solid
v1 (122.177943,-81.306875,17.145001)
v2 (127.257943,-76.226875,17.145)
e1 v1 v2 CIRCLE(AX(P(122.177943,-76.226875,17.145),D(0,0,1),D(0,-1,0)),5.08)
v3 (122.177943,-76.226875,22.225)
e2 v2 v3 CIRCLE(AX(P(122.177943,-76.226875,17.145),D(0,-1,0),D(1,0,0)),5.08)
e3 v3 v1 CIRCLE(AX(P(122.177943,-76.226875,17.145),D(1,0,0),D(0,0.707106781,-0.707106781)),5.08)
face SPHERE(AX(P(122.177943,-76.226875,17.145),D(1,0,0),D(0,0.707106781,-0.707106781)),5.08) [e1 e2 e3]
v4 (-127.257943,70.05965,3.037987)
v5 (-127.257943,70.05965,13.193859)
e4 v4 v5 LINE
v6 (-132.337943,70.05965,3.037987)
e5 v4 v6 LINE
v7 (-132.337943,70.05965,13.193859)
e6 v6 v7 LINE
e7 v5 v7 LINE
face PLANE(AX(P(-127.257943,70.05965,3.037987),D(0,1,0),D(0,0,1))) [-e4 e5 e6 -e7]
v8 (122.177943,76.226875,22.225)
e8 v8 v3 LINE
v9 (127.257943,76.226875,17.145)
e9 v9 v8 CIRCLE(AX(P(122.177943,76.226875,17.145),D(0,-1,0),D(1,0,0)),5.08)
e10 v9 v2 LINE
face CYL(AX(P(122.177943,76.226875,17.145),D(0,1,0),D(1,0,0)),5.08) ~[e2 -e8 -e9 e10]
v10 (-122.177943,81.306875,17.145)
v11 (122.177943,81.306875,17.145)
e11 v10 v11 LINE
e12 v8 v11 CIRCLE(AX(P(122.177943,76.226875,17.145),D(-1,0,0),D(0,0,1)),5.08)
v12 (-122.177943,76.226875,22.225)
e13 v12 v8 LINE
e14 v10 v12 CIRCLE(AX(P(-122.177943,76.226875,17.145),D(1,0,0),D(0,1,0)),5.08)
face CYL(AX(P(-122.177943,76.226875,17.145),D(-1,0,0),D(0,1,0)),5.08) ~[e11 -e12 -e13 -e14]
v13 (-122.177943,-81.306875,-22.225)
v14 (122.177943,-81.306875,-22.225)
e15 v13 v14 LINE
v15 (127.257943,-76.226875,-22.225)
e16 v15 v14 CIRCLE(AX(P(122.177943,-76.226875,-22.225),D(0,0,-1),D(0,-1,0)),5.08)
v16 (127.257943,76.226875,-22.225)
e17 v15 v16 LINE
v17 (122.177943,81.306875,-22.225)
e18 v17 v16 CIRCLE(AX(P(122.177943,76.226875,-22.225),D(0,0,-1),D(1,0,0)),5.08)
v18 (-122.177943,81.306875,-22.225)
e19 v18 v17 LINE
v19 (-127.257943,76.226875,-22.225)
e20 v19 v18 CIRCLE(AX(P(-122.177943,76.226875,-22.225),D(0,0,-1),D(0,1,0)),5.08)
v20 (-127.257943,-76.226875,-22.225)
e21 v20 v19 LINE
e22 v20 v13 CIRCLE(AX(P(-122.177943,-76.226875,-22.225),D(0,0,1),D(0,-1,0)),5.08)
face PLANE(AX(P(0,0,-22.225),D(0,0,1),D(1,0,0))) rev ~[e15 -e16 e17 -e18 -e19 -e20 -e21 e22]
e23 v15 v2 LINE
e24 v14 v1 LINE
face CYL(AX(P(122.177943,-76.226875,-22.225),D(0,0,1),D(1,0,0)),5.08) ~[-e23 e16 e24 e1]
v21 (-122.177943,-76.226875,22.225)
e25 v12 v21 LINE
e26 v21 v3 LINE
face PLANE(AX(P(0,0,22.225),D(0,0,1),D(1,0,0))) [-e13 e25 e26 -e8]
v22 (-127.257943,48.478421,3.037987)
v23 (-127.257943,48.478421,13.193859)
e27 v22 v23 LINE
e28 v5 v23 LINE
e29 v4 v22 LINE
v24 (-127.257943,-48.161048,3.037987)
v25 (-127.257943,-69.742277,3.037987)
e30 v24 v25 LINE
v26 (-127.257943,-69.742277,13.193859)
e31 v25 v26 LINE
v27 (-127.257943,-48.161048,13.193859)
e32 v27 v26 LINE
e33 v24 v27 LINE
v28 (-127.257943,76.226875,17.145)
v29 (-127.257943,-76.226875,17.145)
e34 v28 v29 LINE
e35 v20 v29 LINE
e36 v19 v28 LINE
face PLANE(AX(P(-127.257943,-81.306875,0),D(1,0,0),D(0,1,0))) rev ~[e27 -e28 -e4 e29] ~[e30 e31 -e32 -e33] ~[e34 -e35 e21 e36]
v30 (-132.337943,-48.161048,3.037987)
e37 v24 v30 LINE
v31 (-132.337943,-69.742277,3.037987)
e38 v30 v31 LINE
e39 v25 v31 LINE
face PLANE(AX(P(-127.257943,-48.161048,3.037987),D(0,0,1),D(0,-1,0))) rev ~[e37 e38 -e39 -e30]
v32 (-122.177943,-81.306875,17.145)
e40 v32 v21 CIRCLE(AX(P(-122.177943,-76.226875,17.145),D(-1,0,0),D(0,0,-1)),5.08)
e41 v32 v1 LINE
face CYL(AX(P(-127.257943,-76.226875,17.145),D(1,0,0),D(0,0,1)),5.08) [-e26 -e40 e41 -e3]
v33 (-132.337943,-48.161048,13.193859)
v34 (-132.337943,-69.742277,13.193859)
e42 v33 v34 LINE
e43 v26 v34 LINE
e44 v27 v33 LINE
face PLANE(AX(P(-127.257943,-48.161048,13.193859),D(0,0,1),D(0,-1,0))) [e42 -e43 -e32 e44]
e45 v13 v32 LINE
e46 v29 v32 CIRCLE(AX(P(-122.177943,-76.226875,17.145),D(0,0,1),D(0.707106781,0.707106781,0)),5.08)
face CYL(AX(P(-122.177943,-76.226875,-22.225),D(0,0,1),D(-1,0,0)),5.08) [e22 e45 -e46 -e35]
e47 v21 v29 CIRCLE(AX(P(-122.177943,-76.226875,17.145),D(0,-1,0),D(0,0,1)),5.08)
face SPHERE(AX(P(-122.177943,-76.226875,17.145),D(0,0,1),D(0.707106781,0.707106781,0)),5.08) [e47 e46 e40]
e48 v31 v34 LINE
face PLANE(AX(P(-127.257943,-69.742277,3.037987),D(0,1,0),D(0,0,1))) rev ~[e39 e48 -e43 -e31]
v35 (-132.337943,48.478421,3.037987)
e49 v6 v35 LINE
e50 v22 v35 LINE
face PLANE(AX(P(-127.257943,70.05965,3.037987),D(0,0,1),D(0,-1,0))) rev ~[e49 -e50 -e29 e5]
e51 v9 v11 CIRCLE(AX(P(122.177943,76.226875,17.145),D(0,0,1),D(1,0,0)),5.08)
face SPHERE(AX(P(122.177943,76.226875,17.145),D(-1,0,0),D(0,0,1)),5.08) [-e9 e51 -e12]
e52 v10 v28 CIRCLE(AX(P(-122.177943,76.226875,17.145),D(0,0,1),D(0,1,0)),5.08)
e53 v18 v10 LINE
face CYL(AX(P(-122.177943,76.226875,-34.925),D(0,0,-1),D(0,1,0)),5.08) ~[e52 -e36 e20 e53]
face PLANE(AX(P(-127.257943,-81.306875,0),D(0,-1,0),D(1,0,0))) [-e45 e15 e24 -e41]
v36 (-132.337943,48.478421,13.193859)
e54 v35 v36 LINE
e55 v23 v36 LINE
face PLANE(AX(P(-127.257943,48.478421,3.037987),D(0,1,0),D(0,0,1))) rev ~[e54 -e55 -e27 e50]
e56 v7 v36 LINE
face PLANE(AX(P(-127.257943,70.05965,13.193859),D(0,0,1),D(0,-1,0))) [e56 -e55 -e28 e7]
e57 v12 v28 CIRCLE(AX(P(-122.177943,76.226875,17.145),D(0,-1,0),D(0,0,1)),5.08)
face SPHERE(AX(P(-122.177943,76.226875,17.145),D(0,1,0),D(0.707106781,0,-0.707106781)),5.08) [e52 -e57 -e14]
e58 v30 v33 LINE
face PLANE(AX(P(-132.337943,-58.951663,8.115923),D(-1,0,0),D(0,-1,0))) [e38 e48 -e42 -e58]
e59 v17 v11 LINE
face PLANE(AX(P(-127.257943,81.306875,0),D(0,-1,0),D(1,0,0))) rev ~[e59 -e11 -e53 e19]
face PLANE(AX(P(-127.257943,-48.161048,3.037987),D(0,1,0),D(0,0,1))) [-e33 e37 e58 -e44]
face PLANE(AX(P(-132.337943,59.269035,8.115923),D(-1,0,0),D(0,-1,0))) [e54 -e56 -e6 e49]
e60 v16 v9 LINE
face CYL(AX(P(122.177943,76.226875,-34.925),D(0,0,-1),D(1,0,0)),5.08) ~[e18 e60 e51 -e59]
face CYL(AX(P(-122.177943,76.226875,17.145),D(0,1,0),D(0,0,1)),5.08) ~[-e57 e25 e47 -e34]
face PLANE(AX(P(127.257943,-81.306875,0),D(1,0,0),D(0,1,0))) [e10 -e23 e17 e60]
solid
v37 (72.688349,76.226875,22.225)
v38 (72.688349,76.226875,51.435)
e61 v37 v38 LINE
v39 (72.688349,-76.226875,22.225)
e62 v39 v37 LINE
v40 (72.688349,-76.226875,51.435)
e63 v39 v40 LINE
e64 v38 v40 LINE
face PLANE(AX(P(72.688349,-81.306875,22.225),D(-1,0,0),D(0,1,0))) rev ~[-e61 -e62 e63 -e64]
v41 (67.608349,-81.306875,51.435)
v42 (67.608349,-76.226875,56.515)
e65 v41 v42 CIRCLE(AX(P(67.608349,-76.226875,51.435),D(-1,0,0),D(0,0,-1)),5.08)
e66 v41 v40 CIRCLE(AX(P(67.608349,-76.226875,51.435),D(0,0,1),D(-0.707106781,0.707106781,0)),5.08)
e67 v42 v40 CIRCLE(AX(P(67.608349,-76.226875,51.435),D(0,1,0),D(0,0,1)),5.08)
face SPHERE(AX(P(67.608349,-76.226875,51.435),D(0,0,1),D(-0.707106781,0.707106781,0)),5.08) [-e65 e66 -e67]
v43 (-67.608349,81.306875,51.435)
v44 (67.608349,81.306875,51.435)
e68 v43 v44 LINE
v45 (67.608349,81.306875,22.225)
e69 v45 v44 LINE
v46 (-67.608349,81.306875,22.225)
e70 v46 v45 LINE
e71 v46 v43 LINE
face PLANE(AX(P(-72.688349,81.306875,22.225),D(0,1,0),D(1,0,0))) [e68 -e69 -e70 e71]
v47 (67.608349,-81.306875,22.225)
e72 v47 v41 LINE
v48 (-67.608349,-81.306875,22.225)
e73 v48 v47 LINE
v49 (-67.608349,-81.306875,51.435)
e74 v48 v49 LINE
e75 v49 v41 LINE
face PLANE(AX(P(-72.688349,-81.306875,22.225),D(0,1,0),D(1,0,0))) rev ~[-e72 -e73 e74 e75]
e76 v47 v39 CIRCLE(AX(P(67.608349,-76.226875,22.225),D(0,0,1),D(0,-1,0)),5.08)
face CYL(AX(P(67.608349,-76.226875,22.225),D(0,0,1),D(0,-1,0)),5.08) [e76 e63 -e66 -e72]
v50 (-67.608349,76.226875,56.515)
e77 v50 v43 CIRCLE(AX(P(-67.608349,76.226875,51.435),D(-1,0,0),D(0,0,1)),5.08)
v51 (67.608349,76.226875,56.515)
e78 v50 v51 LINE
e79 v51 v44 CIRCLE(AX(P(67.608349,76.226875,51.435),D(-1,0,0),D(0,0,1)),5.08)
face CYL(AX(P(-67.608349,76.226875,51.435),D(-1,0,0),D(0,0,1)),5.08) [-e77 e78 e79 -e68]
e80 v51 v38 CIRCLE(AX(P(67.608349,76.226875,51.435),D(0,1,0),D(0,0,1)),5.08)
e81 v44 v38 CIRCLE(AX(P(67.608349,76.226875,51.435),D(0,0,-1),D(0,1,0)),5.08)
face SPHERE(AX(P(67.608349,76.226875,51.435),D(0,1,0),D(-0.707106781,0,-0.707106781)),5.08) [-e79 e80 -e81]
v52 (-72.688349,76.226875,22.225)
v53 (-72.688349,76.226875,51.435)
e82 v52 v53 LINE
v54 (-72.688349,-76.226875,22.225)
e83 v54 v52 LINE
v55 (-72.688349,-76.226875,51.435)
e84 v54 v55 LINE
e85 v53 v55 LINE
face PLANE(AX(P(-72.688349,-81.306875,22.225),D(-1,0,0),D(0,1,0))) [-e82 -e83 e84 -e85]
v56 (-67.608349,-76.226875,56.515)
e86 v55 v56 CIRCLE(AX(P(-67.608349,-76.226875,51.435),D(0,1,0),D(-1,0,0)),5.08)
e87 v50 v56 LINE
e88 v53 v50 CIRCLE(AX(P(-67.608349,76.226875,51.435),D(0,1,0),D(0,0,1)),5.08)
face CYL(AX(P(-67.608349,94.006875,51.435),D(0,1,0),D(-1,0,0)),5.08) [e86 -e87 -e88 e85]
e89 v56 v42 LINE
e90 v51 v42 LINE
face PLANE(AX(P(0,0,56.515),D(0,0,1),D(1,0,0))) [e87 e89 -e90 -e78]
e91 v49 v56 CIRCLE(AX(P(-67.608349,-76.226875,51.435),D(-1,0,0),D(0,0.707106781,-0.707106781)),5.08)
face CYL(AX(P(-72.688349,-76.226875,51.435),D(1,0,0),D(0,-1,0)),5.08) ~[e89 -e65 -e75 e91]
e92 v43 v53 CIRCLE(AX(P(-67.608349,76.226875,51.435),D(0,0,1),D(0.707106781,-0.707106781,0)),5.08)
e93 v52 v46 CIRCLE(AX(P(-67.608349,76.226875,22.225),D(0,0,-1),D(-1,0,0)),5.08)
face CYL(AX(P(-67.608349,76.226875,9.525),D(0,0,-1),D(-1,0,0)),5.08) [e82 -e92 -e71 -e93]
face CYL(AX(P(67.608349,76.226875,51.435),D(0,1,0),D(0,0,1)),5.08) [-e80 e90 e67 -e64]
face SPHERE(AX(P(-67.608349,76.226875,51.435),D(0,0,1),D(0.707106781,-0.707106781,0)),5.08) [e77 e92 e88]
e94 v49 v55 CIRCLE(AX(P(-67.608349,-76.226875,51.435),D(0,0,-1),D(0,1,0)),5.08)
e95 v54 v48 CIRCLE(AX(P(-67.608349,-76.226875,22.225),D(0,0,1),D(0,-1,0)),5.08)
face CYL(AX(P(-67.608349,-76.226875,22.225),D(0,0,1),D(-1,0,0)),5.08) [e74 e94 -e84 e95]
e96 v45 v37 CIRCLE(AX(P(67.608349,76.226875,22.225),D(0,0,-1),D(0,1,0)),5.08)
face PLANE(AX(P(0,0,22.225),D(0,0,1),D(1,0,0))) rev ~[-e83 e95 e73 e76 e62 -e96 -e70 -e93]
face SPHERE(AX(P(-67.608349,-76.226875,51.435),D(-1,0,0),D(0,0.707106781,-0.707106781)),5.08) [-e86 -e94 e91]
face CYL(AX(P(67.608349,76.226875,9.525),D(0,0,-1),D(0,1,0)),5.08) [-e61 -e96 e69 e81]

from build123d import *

# Parameters (mm, degrees)
F0_W            = 254.5158863068
F0_H            = 162.6137495041
F1_DEPTH        = 22.225
F2_W            = 145.3766971827
F2_H            = 162.6137495041
F3_DEPTH        = 34.29
F9_R            = 5.08
F10_R           = 5.08
F11_T1_DEPTH    = 170.2337495041
F11_T3_DEPTH    = 59.69
F11_S7_W        = 5.08
F11_S7_H        = 5.08
F11_T8_DEPTH    = 5.08
F12_T1_DEPTH    = 152.4537495041
F12_T3_DEPTH    = 52.07
F12_T5_DEPTH    = 262.1358863068
F12_S9_W        = 5.08
F12_S9_H        = 5.08
F12_T10_DEPTH   = 5.08
F12_S15_W       = 5.08
F12_S15_H       = 5.08
F12_T16_DEPTH   = 5.08
F13_T1_DEPTH    = 152.4537495041
F13_T3_DEPTH    = 41.91
F13_T5_DEPTH    = 135.2166971826
F13_S9_W        = 5.08
F13_S9_H        = 5.08
F13_T10_DEPTH   = 5.08
F13_S15_W       = 5.08
F13_S15_H       = 5.08
F13_T16_DEPTH   = 5.08
F13_S21_W       = 5.08
F13_S21_H       = 5.08
F13_T22_DEPTH   = 5.08
F13_2_T1_DEPTH  = 152.453749504
F13_2_T3_DEPTH  = 52.07
F13_2_S7_W      = 5.08
F13_2_S7_H      = 5.08
F13_2_T8_DEPTH  = 5.08
F13_2_T12_ANGLE = 90.0000000017
F14_W           = 21.5812288225
F14_H           = 10.1558715105
F15_DEPTH       = 5.08


# Not quite as in the source:
# - a fillet or chamfer that OpenCascade refuses, or shapes differently, is made with other operations: its cross-section is extruded or revolved along the edge and cut away or added


with BuildPart() as f1:
    # F0 (on Top) → F1 (new body, symmetric)
    with BuildSketch(Plane.XY):
        Rectangle(F0_W, F0_H)
    extrude(amount=F1_DEPTH, both=True)

    # F10
    f10_edges = [f1.edges().sort_by_distance(p)[0] for p in [
        (0, -81.306875, 22.225),
        (-127.257943, -81.306875, 0),
        (127.257943, -81.306875, 0),
    ]]
    fillet(f10_edges, radius=F10_R)

    # F12: fillet of radius 5.08 on 3 edges, made by hand

    # F12_s2 → F12_t1 (cut)
    with BuildSketch(Plane.XZ.offset(-76.226874752)):
        with BuildLine():
            ThreePointArc((-122.1779431534, 22.225), (-125.7700456018, 20.7371024484), (-127.2579431534, 17.145))
            Line((-127.2579431534, 17.145), (-127.2579431534, 22.225))
            Line((-127.2579431534, 22.225), (-122.1779431534, 22.225))
        make_face()
    extrude(amount=F12_T1_DEPTH, mode=Mode.SUBTRACT)

    # F12_s4 → F12_t3 (cut)
    with BuildSketch(Plane.XY.offset(-34.925)):
        with BuildLine():
            ThreePointArc((-122.1779431534, 81.306874752), (-125.7700456018, 79.8189772005), (-127.2579431534, 76.226874752))
            Line((-127.2579431534, 76.226874752), (-127.2579431534, 81.306874752))
            Line((-127.2579431534, 81.306874752), (-122.1779431534, 81.306874752))
        make_face()
    extrude(amount=F12_T3_DEPTH, mode=Mode.SUBTRACT)

    # F12_s6 → F12_t5 (cut)
    with BuildSketch(Plane.YZ.offset(-122.1779431534)):
        with BuildLine():
            ThreePointArc((81.306874752, 17.145), (79.8189772005, 20.7371024484), (76.226874752, 22.225))
            Line((76.226874752, 22.225), (81.306874752, 22.225))
            Line((81.306874752, 22.225), (81.306874752, 17.145))
        make_face()
    extrude(amount=F12_T5_DEPTH, mode=Mode.SUBTRACT)


with BuildPart() as f3:
    # F2 (on face) → F3 (new body)
    with BuildSketch(Plane.XY.offset(22.225)):
        Rectangle(F2_W, F2_H)
    extrude(amount=F3_DEPTH)

    # F9
    f9_edges = [f3.edges().sort_by_distance(p)[0] for p in [
        (0, -81.306875, 56.515),
        (-72.688349, -81.306875, 39.37),
        (72.688349, -81.306875, 39.37),
    ]]
    fillet(f9_edges, radius=F9_R)

    # F11: fillet of radius 5.08 on 2 edges, made by hand

    # F11_s2 → F11_t1 (cut)
    with BuildSketch(Plane.XZ.offset(-94.006874752)):
        with BuildLine():
            ThreePointArc((-72.6883485913, 51.435), (-71.2004510398, 55.0271024484), (-67.6083485913, 56.515))
            Line((-67.6083485913, 56.515), (-72.6883485913, 56.515))
            Line((-72.6883485913, 56.515), (-72.6883485913, 51.435))
        make_face()
    extrude(amount=F11_T1_DEPTH, mode=Mode.SUBTRACT)

    # F11_s4 → F11_t3 (cut)
    with BuildSketch(Plane.XY.offset(9.525)):
        with BuildLine():
            ThreePointArc((-72.6883485913, 76.226874752), (-71.2004510398, 79.8189772005), (-67.6083485913, 81.306874752))
            Line((-67.6083485913, 81.306874752), (-72.6883485913, 81.306874752))
            Line((-72.6883485913, 81.306874752), (-72.6883485913, 76.226874752))
        make_face()
    extrude(amount=F11_T3_DEPTH, mode=Mode.SUBTRACT)


with BuildPart() as f11_tool6:
    # F11_s7 → F11_t8 (new body)
    with BuildSketch(Plane.YZ.offset(-67.6083485913)):
        with Locations((-78.766874752, 53.975)):
            Rectangle(F11_S7_W, F11_S7_H)
    extrude(amount=-F11_T8_DEPTH)

    # F11_s9 → F11_t10 (revolve, cut)
    with BuildSketch(Plane(origin=(-67.6083485913, -76.226874752, 51.435), x_dir=(0, 0.7071067812, -0.7071067812), z_dir=(0, 0.7071067812, 0.7071067812))):
        with BuildLine():
            ThreePointArc((0, -5.08), (5.08, 0), (0, 5.08))
            Line((0, 5.08), (0, -5.08))
        make_face()
    revolve(axis=Axis((-67.6083485913, -76.226874752, 51.435), (-1, 0, 0)), mode=Mode.SUBTRACT)


with BuildPart() as f3_1:
    add(f3.part)

    # F11_t5: cut F11_tool6
    add(f11_tool6.part, mode=Mode.SUBTRACT)

    # F13: fillet of radius 5.08 on 3 edges, made by hand

    # F13_s2 → F13_t1 (cut)
    with BuildSketch(Plane.XZ.offset(-76.226874752)):
        with BuildLine():
            ThreePointArc((67.6083485913, 56.515), (71.2004510398, 55.0271024484), (72.6883485913, 51.435))
            Line((72.6883485913, 51.435), (72.6883485913, 56.515))
            Line((72.6883485913, 56.515), (67.6083485913, 56.515))
        make_face()
    extrude(amount=F13_T1_DEPTH, mode=Mode.SUBTRACT)

    # F13_s4 → F13_t3 (cut)
    with BuildSketch(Plane.XY.offset(9.525)):
        with BuildLine():
            ThreePointArc((67.6083485913, 81.306874752), (71.2004510398, 79.8189772005), (72.6883485913, 76.226874752))
            Line((72.6883485913, 76.226874752), (72.6883485913, 81.306874752))
            Line((72.6883485913, 81.306874752), (67.6083485913, 81.306874752))
        make_face()
    extrude(amount=F13_T3_DEPTH, mode=Mode.SUBTRACT)

    # F13_s6 → F13_t5 (cut)
    with BuildSketch(Plane.YZ.offset(-67.6083485913)):
        with BuildLine():
            ThreePointArc((76.226874752, 56.515), (79.8189772005, 55.0271024484), (81.306874752, 51.435))
            Line((81.306874752, 51.435), (81.306874752, 56.515))
            Line((81.306874752, 56.515), (76.226874752, 56.515))
        make_face()
    extrude(amount=F13_T5_DEPTH, mode=Mode.SUBTRACT)


with BuildPart() as f12_tool8:
    # F12_s9 → F12_t10 (new body)
    with BuildSketch(Plane.XY.offset(17.145)):
        with Locations((-124.7179431534, -78.766874752)):
            Rectangle(F12_S9_W, F12_S9_H)
    extrude(amount=F12_T10_DEPTH)

    # F12_s11 → F12_t12 (revolve, cut)
    with BuildSketch(Plane(origin=(-122.1779431534, -76.226874752, 17.145), x_dir=(0.7071067812, 0.7071067812, 0), z_dir=(0.7071067812, -0.7071067812, 0))):
        with BuildLine():
            ThreePointArc((0, -5.08), (5.08, 0), (0, 5.08))
            Line((0, 5.08), (0, -5.08))
        make_face()
    revolve(axis=Axis((-122.1779431534, -76.226874752, 17.145), (0, 0, 1)), mode=Mode.SUBTRACT)


with BuildPart() as f1_1:
    add(f1.part)

    # F12_t7: cut F12_tool8
    add(f12_tool8.part, mode=Mode.SUBTRACT)


with BuildPart() as f12_tool14:
    # F12_s15 → F12_t16 (new body)
    with BuildSketch(Plane.XZ.offset(-76.226874752)):
        with Locations((-124.7179431534, 19.685)):
            Rectangle(F12_S15_W, F12_S15_H)
    extrude(amount=-F12_T16_DEPTH)

    # F12_s17 → F12_t18 (revolve, cut)
    with BuildSketch(Plane(origin=(-122.1779431534, 76.226874752, 17.145), x_dir=(0.7071067812, 0, -0.7071067812), z_dir=(0.7071067812, 0, 0.7071067812))):
        with BuildLine():
            ThreePointArc((0, -5.08), (5.08, 0), (0, 5.08))
            Line((0, 5.08), (0, -5.08))
        make_face()
    revolve(axis=Axis((-122.1779431534, 76.226874752, 17.145), (0, 1, 0)), mode=Mode.SUBTRACT)


with BuildPart() as f1_2:
    add(f1_1.part)

    # F12_t13: cut F12_tool14
    add(f12_tool14.part, mode=Mode.SUBTRACT)

    # F13#2: fillet of radius 5.08 on 1 edges, made by hand

    # F13_2_s2 → F13_2_t1 (cut)
    with BuildSketch(Plane.XZ.offset(-76.226874752)):
        with BuildLine():
            ThreePointArc((127.2579431534, 17.145), (125.7700456018, 20.7371024484), (122.1779431534, 22.225))
            Line((122.1779431534, 22.225), (127.2579431534, 22.225))
            Line((127.2579431534, 22.225), (127.2579431534, 17.145))
        make_face()
    extrude(amount=F13_2_T1_DEPTH, mode=Mode.SUBTRACT)

    # F13_2_s4 → F13_2_t3 (cut)
    with BuildSketch(Plane.XY.offset(-34.925)):
        with BuildLine():
            ThreePointArc((127.2579431534, 76.226874752), (125.7700456018, 79.8189772005), (122.1779431534, 81.306874752))
            Line((122.1779431534, 81.306874752), (127.2579431534, 81.306874752))
            Line((127.2579431534, 81.306874752), (127.2579431534, 76.226874752))
        make_face()
    extrude(amount=F13_2_T3_DEPTH, mode=Mode.SUBTRACT)


with BuildPart() as f13_tool8:
    # F13_s9 → F13_t10 (new body)
    with BuildSketch(Plane.XY.offset(51.435)):
        with Locations((-70.1483485913, 78.766874752)):
            Rectangle(F13_S9_W, F13_S9_H)
    extrude(amount=F13_T10_DEPTH)

    # F13_s11 → F13_t12 (revolve, cut)
    with BuildSketch(Plane(origin=(-67.6083485913, 76.226874752, 51.435), x_dir=(0.7071067812, -0.7071067812, 0), z_dir=(-0.7071067812, -0.7071067812, 0))):
        with BuildLine():
            ThreePointArc((0, -5.08), (5.08, 0), (0, 5.08))
            Line((0, 5.08), (0, -5.08))
        make_face()
    revolve(axis=Axis((-67.6083485913, 76.226874752, 51.435), (0, 0, 1)), mode=Mode.SUBTRACT)


with BuildPart() as f3_2:
    add(f3_1.part)

    # F13_t7: cut F13_tool8
    add(f13_tool8.part, mode=Mode.SUBTRACT)


with BuildPart() as f13_tool14:
    # F13_s15 → F13_t16 (new body)
    with BuildSketch(Plane.XY.offset(51.435)):
        with Locations((70.1483485913, -78.766874752)):
            Rectangle(F13_S15_W, F13_S15_H)
    extrude(amount=F13_T16_DEPTH)

    # F13_s17 → F13_t18 (revolve, cut)
    with BuildSketch(Plane(origin=(67.6083485913, -76.226874752, 51.435), x_dir=(-0.7071067812, 0.7071067812, 0), z_dir=(0.7071067812, 0.7071067812, 0))):
        with BuildLine():
            ThreePointArc((0, -5.08), (5.08, 0), (0, 5.08))
            Line((0, 5.08), (0, -5.08))
        make_face()
    revolve(axis=Axis((67.6083485913, -76.226874752, 51.435), (0, 0, 1)), mode=Mode.SUBTRACT)


with BuildPart() as f3_3:
    add(f3_2.part)

    # F13_t13: cut F13_tool14
    add(f13_tool14.part, mode=Mode.SUBTRACT)


with BuildPart() as f13_tool20:
    # F13_s21 → F13_t22 (new body)
    with BuildSketch(Plane.XZ.offset(-76.226874752)):
        with Locations((70.1483485913, 53.975)):
            Rectangle(F13_S21_W, F13_S21_H)
    extrude(amount=-F13_T22_DEPTH)

    # F13_s23 → F13_t24 (revolve, cut)
    with BuildSketch(Plane(origin=(67.6083485913, 76.226874752, 51.435), x_dir=(-0.7071067812, 0, -0.7071067812), z_dir=(0.7071067812, 0, -0.7071067812))):
        with BuildLine():
            ThreePointArc((0, -5.08), (5.08, 0), (0, 5.08))
            Line((0, 5.08), (0, -5.08))
        make_face()
    revolve(axis=Axis((67.6083485913, 76.226874752, 51.435), (0, 1, 0)), mode=Mode.SUBTRACT)


with BuildPart() as f3_4:
    add(f3_3.part)

    # F13_t19: cut F13_tool20
    add(f13_tool20.part, mode=Mode.SUBTRACT)


with BuildPart() as f13_2_tool6:
    # F13_2_s7 → F13_2_t8 (new body)
    with BuildSketch(Plane.YZ.offset(122.1779431534)):
        with Locations((-78.766874752, 19.685)):
            Rectangle(F13_2_S7_W, F13_2_S7_H)
    extrude(amount=F13_2_T8_DEPTH)

    # F13_2_s9 → F13_2_t10 (revolve, cut)
    with BuildSketch(Plane(origin=(122.1779431534, -76.226874752, 17.145), x_dir=(0, 0.7071067812, -0.7071067812), z_dir=(0, -0.7071067812, -0.7071067812))):
        with BuildLine():
            ThreePointArc((0, -5.08), (5.08, 0), (0, 5.08))
            Line((0, 5.08), (0, -5.08))
        make_face()
    revolve(axis=Axis((122.1779431534, -76.226874752, 17.145), (1, 0, 0)), mode=Mode.SUBTRACT)


with BuildPart() as f1_3:
    add(f1_2.part)

    # F13_2_t5: cut F13_2_tool6
    add(f13_2_tool6.part, mode=Mode.SUBTRACT)

    # F13_2_s11 → F13_2_t12 (revolve, cut)
    with BuildSketch(Plane.XZ.offset(-76.2268747521)):
        with BuildLine():
            ThreePointArc((127.2579431534, 17.145), (125.7700456018, 20.7371024484), (122.1779431534, 22.225))
            Line((122.1779431534, 22.225), (127.2579431534, 22.225))
            Line((127.2579431534, 22.225), (127.2579431534, 17.145))
        make_face()
    revolve(axis=Axis((127.2579431534, 76.2268747521, 17.1450000001), (-1, 0, 0)), revolution_arc=F13_2_T12_ANGLE, mode=Mode.SUBTRACT)

    # F14 (on face) → F15 (join)
    with BuildSketch(Plane(origin=(-127.2579431534, 0, 0), x_dir=(0, -1, 0), z_dir=(-1, 0, 0))):
        with Locations((-59.269035235, 8.1159230322)):
            Rectangle(F14_W, F14_H)
        with Locations((58.9516628534, 8.1159230322)):
            Rectangle(F14_W, F14_H)
    extrude(amount=F15_DEPTH)


solid = Compound([f3_4.part, f1_3.part])
